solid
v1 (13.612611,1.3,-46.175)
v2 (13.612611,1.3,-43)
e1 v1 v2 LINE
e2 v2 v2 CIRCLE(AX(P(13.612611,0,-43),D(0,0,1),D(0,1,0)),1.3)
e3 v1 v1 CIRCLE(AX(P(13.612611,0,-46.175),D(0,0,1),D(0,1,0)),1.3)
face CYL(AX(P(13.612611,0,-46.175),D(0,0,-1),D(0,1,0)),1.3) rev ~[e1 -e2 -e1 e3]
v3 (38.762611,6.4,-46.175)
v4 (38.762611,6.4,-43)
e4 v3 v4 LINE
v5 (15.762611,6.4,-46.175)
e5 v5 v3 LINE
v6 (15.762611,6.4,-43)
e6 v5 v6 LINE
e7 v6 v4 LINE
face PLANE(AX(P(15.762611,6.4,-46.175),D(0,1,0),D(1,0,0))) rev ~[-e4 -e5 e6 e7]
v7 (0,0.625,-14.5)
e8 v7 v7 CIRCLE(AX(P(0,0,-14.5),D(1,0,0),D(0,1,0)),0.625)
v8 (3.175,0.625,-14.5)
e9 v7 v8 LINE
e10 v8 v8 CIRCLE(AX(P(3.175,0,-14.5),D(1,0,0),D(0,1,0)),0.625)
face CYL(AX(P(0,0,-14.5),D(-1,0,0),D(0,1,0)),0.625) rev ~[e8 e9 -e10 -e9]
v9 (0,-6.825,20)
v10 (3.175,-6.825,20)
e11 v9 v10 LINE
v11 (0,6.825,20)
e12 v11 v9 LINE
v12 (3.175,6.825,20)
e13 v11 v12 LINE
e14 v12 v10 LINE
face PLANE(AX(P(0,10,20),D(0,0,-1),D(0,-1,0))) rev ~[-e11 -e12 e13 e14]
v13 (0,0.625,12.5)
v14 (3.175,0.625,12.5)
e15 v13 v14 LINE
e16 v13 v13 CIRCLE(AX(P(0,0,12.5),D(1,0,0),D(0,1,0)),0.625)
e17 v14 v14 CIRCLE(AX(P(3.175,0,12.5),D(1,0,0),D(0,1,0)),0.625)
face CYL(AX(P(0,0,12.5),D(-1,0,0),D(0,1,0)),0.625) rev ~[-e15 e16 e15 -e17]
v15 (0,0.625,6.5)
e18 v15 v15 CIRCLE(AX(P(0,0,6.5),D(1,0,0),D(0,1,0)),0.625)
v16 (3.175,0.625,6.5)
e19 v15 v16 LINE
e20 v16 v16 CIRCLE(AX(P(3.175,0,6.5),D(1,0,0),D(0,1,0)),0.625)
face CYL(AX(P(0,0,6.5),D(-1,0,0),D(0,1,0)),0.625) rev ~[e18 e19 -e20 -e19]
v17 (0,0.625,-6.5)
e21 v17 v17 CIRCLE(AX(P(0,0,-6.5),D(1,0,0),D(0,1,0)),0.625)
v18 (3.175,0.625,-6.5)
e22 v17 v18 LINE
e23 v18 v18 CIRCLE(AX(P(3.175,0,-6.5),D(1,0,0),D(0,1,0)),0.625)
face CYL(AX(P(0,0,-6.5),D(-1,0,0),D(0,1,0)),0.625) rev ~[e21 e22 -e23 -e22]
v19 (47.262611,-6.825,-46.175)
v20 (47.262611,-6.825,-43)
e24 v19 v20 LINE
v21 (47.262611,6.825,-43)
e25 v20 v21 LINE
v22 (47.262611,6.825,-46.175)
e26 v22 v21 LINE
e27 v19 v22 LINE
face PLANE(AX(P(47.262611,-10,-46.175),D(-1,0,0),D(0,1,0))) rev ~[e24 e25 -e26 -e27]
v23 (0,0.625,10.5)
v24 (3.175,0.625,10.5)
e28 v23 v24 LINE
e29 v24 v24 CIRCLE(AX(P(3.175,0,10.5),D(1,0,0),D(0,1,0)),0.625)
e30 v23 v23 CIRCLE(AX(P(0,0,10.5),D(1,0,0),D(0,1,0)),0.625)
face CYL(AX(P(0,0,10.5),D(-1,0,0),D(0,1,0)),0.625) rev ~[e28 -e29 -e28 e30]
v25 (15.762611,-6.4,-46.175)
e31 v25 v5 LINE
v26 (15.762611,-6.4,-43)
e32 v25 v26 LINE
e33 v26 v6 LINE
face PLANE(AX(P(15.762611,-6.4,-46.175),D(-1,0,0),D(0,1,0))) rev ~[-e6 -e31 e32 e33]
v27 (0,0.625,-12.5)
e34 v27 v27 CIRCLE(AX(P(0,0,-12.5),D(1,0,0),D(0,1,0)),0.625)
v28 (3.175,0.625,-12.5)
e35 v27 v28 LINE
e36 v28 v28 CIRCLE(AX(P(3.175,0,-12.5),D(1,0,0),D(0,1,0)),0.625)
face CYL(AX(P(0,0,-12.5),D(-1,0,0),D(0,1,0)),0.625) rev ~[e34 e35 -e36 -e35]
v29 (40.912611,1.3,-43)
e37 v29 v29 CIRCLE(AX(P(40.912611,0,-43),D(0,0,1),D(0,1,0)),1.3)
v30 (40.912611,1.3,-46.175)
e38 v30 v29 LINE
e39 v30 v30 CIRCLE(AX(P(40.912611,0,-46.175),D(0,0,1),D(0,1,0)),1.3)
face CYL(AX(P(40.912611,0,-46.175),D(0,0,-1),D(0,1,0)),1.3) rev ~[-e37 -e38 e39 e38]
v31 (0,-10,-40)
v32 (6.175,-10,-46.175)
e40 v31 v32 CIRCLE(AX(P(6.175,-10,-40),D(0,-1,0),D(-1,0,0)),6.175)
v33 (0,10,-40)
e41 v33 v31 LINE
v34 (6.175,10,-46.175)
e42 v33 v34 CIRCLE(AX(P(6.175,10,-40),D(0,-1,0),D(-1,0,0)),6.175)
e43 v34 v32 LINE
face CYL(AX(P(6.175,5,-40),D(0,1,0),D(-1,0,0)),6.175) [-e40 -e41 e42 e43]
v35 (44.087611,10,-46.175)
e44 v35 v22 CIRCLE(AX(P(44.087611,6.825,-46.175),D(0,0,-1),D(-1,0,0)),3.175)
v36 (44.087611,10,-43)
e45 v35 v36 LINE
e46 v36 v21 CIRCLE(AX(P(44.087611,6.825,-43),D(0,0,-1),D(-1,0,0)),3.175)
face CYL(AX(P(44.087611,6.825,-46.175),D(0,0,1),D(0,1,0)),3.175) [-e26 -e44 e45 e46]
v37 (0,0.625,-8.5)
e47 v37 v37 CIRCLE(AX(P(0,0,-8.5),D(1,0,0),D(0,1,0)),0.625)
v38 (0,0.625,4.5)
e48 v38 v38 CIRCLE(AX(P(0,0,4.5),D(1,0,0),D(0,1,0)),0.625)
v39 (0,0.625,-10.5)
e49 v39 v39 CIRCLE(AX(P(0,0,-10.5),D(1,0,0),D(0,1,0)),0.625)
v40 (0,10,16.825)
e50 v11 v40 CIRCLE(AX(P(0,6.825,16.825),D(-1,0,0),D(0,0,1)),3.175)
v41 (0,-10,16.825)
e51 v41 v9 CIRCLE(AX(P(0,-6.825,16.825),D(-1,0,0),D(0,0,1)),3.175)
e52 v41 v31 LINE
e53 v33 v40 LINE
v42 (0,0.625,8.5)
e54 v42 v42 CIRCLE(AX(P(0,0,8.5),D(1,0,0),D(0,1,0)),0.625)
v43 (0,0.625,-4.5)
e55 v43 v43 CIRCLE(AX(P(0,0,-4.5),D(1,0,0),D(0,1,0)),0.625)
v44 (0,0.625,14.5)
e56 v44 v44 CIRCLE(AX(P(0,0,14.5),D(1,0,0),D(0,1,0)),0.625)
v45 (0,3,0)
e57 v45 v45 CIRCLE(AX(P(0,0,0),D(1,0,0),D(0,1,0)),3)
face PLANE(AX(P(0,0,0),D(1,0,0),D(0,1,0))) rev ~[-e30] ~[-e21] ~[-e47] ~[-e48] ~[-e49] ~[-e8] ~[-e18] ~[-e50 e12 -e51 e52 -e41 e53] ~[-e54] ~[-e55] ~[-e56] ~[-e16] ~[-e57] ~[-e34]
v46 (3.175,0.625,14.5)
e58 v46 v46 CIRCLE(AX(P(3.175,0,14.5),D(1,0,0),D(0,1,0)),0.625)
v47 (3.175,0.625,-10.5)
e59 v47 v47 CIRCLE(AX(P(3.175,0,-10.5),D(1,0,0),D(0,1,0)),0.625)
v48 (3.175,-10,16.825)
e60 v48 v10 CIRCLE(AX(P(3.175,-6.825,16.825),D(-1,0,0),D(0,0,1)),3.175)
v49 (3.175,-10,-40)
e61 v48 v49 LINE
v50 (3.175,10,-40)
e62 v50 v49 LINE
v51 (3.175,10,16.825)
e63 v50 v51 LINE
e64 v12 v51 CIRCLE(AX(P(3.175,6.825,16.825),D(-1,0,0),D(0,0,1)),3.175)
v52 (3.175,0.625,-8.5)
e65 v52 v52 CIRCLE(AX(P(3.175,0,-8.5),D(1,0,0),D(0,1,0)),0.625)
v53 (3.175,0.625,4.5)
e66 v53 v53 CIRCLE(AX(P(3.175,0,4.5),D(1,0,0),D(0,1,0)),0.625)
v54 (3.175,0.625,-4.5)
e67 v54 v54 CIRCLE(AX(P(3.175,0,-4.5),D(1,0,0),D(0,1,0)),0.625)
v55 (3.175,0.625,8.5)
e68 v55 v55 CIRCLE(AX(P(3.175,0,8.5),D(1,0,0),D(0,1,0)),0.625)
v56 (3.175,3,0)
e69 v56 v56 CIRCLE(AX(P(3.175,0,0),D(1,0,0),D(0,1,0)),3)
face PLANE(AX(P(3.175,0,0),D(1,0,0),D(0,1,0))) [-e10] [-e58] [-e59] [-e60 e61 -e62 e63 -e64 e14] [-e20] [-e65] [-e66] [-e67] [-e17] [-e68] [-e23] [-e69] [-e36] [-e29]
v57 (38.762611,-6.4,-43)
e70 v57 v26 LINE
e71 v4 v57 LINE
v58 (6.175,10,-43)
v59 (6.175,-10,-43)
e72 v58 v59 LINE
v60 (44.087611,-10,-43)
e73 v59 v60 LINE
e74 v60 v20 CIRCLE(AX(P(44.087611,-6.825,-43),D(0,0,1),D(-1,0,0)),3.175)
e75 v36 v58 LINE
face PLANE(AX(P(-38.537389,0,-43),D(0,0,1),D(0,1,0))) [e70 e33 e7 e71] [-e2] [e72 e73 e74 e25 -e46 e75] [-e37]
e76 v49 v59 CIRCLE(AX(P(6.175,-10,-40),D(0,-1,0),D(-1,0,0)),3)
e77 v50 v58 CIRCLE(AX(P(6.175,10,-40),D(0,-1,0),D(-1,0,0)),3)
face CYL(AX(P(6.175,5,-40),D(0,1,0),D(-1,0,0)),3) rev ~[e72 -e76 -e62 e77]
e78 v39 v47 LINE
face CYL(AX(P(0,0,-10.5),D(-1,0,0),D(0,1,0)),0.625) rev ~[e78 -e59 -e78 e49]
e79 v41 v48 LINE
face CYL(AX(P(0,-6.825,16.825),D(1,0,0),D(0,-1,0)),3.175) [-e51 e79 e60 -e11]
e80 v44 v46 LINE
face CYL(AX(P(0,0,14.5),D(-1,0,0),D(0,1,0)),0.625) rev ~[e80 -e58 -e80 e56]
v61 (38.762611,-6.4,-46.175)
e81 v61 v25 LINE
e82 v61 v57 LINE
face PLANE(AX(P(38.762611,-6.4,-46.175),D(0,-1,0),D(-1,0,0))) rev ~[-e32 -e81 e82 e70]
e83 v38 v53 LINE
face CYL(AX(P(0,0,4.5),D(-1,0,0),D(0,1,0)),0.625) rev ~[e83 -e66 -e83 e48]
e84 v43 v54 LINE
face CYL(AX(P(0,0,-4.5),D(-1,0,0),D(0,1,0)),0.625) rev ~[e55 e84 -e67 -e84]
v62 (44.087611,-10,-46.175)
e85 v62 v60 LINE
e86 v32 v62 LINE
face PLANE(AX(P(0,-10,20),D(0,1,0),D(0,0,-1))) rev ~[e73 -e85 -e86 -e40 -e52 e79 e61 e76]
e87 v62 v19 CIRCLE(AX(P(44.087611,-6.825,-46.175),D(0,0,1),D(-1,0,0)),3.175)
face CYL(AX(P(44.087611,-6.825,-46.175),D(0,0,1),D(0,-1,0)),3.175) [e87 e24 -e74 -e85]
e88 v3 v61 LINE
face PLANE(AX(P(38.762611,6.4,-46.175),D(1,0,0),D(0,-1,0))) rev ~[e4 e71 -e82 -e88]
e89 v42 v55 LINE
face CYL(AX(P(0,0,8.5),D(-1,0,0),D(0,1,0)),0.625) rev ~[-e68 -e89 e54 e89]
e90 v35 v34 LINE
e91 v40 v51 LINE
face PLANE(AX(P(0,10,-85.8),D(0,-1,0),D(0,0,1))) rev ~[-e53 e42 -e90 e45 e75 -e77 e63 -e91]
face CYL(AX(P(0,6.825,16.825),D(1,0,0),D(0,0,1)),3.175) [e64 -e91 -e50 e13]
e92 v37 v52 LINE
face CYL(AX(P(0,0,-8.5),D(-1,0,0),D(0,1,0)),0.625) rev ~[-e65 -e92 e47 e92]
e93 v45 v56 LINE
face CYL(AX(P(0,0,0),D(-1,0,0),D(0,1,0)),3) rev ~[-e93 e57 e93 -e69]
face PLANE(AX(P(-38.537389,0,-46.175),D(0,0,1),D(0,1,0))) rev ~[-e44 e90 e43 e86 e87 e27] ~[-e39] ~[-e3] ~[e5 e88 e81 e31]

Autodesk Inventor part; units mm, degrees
ref_plane "YZ Plane" through (0, 0, 0) normal (1, 0, 0) x (0, 1, 0)
ref_plane "XZ Plane" through (0, 0, 0) normal (0, 1, 0) x (-1, 0, 0)
ref_plane "XY Plane" through (0, 0, 0) normal (0, 0, 1) x (1, 0, 0)
sketch "Sketch1" plane through (0, 0, 0) normal (1, 0, 0) x (0, 1, 0)
  circle A0 centre (0, 0) radius 2.5 construction
  circle A1 centre (0, 0) radius 3
  line L0 (0, 0) -> (0, -32.9) construction
  line L1 (-10, -85.8) -> (10, -85.8)
  line L2 (10, -85.8) -> (10, 20)
  line L3 (10, 20) -> (-10, 20)
  line L4 (-10, 20) -> (-10, -85.8)
  line L5 (-10, -85.8) -> (10, 20) construction
  line L6 (10, -85.8) -> (-10, 20) construction
  circle A2 centre (0, 0) radius 4.5 construction
  circle A3 centre (0, -4.5) radius 0.625
  circle A4 centre (0, -6.5) radius 0.625
  circle A5 centre (0, -8.5) radius 0.625
  circle A6 centre (0, -10.5) radius 0.625
  circle A7 centre (0, -12.5) radius 0.625
  circle A8 centre (0, -14.5) radius 0.625
  circle A9 centre (0, 14.5) radius 0.625
  circle A10 centre (0, 12.5) radius 0.625
  circle A11 centre (0, 10.5) radius 0.625
  circle A12 centre (0, 8.5) radius 0.625
  circle A13 centre (0, 6.5) radius 0.625
  circle A14 centre (0, 4.5) radius 0.625
  line L7 (-6.4, -54.3) -> (6.4, -54.3)
  line L8 (6.4, -54.3) -> (6.4, -77.3)
  line L9 (6.4, -77.3) -> (-6.4, -77.3)
  line L10 (-6.4, -77.3) -> (-6.4, -54.3)
  line L11 (-6.4, -54.3) -> (6.4, -77.3) construction
  line L12 (6.4, -54.3) -> (-6.4, -77.3) construction
  circle A15 centre (0, -65.8) radius 13.65 construction
  circle A16 centre (0, -79.45) radius 1.3
  circle A17 centre (0, -52.15) radius 1.3
  dimension "d5" = 9
  dimension "d19" = 27.3
  dimension "d0" = 5
  dimension "d1" = 6
  dimension "d2" = 20
  dimension "d3" = 105.8
  dimension "d4" = 20
  dimension "d6" = 1.25
  dimension "d9" = 2
  dimension "d16" = 360
  dimension "d18" = 23
  dimension "d20" = 2.6
  dimension "d21" = 12.8
  dimension "d24" = 360
  dimension "d26" = 20
extrude "Extrusion1" add sketch "Sketch1" along normal blind 3.175
fillet "Fillet1" radius 3.175 4 edges at (1.5875, 10, 20) (1.5875, -10, 20) (1.5875, 10, -85.8) (1.5875, -10, -85.8)
sketch "Sketch2" plane through (3.175, 0, 0) normal (1, 0, 0) x (0, 0, -1)
  line L0 (82.625, 10) -> (-16.825, 10) projected
  line L1 (40, 10) -> (40, -10)
  line L2 (-16.825, -10) -> (82.625, -10) projected
  line L3 (-20, 6.825) -> (-20, -6.825) projected
  point P0 (0, 0)
  dimension "d30" = 60
bend part "Bend Part1" radius 3 angle 90 line through (3.175, 10, -40) along (0, -1, 0) centre toward (1, 0, 0) moving side (0, 0, -1) both sides no
properties part number "Topplate"
